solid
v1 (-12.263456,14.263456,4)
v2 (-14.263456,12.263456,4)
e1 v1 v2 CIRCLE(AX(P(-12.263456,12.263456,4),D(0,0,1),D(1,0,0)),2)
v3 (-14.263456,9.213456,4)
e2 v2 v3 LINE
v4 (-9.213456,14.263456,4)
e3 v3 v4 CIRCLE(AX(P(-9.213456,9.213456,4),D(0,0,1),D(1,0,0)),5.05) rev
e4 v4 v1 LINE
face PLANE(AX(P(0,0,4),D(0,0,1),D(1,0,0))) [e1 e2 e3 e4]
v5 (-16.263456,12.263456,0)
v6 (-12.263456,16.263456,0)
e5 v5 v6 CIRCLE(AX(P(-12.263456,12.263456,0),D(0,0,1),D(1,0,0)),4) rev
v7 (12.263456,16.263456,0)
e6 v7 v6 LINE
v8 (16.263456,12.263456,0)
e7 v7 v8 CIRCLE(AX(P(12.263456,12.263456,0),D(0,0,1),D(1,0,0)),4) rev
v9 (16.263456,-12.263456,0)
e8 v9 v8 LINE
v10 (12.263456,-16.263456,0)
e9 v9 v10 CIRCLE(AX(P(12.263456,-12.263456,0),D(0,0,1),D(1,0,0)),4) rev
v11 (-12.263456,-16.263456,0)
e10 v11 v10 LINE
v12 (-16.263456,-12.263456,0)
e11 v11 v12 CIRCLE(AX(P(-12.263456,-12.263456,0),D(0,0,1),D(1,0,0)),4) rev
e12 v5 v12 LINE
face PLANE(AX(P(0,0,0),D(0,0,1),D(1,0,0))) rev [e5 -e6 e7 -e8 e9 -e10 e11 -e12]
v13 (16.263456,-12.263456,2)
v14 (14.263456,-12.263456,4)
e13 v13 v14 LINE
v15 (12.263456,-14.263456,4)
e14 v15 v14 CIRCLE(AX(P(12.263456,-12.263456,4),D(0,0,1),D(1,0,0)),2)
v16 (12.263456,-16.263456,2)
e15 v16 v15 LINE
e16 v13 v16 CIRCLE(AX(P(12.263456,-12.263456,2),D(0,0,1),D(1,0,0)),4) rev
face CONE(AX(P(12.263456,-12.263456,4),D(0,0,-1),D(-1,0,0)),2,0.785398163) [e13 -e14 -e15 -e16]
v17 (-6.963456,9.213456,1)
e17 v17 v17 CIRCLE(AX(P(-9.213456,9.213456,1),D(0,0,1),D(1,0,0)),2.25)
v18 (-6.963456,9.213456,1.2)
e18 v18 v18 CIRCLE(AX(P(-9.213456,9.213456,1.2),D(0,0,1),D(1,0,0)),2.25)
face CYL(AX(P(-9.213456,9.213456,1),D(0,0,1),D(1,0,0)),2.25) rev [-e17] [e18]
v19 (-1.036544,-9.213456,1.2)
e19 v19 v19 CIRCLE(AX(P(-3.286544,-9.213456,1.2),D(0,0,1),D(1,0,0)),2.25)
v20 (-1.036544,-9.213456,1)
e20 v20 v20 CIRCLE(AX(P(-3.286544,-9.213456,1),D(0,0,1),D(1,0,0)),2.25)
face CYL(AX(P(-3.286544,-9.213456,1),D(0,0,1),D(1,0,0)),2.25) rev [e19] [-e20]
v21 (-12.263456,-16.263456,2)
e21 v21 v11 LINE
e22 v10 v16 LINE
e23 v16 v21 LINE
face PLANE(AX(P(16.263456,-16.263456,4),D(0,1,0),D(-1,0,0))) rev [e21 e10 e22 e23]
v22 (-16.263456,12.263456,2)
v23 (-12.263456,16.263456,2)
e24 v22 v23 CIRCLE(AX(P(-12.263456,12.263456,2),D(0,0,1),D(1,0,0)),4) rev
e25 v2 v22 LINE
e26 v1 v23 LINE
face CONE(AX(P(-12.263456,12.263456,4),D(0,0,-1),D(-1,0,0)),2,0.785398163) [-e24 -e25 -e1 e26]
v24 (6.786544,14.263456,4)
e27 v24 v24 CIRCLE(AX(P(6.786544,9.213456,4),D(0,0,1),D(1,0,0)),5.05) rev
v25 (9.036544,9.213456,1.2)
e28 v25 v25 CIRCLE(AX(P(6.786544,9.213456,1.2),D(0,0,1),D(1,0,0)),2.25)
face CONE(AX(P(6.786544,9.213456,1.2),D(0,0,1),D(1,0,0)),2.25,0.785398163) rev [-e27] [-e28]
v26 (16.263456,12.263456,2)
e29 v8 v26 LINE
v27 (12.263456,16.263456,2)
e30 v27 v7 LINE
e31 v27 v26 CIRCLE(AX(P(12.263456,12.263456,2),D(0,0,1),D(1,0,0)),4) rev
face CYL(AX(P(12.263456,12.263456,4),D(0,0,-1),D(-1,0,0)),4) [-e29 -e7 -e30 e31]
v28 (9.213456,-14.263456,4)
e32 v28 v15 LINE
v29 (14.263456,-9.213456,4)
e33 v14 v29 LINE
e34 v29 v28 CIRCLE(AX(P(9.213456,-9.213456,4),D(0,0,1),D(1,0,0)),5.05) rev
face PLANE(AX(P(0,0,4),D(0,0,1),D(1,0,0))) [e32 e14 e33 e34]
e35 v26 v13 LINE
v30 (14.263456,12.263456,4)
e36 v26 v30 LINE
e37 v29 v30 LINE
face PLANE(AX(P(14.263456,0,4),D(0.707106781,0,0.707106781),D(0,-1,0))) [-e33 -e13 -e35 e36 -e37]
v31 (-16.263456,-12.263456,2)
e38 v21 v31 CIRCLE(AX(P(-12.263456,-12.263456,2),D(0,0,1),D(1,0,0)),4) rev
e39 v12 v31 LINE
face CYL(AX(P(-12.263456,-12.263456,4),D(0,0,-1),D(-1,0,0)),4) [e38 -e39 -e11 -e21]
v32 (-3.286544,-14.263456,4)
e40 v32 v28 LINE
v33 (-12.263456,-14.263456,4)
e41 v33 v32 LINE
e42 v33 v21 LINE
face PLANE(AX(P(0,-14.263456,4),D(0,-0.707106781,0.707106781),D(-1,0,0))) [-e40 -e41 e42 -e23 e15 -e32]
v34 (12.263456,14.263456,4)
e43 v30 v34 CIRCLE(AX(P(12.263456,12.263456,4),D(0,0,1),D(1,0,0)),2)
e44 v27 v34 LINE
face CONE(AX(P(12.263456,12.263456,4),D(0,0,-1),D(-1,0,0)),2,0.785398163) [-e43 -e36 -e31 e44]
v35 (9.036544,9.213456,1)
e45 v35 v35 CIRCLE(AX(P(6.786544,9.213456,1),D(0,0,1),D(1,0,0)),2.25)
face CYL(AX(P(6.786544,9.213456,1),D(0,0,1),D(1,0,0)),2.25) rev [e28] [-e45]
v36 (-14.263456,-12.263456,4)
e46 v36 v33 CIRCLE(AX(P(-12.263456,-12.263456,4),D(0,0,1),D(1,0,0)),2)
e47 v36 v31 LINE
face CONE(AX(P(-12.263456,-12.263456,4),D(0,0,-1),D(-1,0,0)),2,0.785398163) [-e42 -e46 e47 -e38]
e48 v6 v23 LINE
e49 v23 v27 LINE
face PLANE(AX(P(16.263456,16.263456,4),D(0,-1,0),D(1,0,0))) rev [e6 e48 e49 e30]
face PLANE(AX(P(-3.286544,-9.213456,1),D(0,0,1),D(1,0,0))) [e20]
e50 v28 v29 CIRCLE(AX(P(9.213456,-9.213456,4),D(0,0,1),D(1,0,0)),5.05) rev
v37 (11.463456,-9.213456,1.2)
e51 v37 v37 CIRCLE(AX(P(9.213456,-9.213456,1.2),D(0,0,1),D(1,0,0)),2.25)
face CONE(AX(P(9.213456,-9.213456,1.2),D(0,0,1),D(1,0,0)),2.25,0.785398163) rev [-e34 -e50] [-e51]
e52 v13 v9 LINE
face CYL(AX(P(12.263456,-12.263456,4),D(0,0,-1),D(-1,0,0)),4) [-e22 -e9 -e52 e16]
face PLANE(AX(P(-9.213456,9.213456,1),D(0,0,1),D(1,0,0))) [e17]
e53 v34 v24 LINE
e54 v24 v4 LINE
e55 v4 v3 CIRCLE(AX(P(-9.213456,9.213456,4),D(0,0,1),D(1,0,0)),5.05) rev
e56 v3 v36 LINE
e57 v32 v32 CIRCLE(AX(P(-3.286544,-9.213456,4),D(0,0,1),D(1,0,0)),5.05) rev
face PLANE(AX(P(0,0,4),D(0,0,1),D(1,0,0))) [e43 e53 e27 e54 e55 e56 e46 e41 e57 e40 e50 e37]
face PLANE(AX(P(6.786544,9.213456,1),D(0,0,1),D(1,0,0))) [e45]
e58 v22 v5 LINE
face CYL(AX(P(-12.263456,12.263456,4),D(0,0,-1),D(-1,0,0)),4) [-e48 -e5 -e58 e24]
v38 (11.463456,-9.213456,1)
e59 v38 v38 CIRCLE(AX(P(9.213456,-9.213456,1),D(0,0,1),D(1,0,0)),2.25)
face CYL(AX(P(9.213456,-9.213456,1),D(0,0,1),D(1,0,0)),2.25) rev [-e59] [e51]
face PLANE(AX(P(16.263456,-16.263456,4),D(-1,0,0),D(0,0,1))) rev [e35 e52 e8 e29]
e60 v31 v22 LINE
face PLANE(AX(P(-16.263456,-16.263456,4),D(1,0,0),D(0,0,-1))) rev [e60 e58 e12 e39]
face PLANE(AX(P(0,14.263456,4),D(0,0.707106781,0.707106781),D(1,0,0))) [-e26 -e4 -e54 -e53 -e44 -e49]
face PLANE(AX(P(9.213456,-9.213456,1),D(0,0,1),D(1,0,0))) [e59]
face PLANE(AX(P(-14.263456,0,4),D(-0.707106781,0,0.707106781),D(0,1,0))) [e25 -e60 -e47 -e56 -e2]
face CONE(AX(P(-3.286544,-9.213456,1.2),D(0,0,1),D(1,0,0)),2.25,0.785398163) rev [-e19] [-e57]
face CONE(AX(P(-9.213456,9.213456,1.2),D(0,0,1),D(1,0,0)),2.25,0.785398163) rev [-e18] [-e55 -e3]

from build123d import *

# Parameters (mm, degrees)
SKETCH1_W           = 32.526911934
SKETCH1_H           = 32.526911934
BOSS_EXTRUDE1_DEPTH = 4
FILLET1_R           = 4
CHAMFER1_SIZE       = 2
SKETCH2_R           = 2.25
CUT_EXTRUDE1_DEPTH  = 3
CHAMFER2_SIZE       = 2.8


with BuildPart() as part:
    # Sketch1 → Boss-Extrude1 (new body)
    with BuildSketch(Plane.XY):
        Rectangle(SKETCH1_W, SKETCH1_H)
    extrude(amount=BOSS_EXTRUDE1_DEPTH)

    # Fillet1
    fillet1_edges = [part.edges().sort_by_distance(p)[0] for p in [
        (-16.263455967, 16.263455967, 2),
        (16.263455967, 16.263455967, 2),
        (16.263455967, -16.263455967, 2),
        (-16.263455967, -16.263455967, 2),
    ]]
    fillet(fillet1_edges, radius=FILLET1_R)

    # Chamfer1
    chamfer1_edges = [part.edges().sort_by_distance(p)[0] for p in [
        (0, -16.263455967, 4),
        (-16.263455967, 0, 4),
        (16.263455967, 0, 4),
        (0, 16.263455967, 4),
        (-15.091883092, 15.091883092, 4),
        (15.091883092, 15.091883092, 4),
        (15.091883092, -15.091883092, 4),
        (-15.091883092, -15.091883092, 4),
    ]]
    chamfer(chamfer1_edges, length=CHAMFER1_SIZE)

    # Sketch2 → Cut-Extrude1 (cut)
    with BuildSketch(Plane.XY.offset(4)):
        with Locations((-9.213455967, 9.213455967)):
            Circle(SKETCH2_R)
        with Locations((9.213455967, -9.213455967)):
            Circle(SKETCH2_R)
        with Locations((-3.286544033, -9.213455967)):
            Circle(SKETCH2_R)
        with Locations((6.786544033, 9.213455967)):
            Circle(SKETCH2_R)
    extrude(amount=-CUT_EXTRUDE1_DEPTH, mode=Mode.SUBTRACT)

    # Chamfer2
    chamfer2_edges = [part.edges().sort_by_distance(p)[0] for p in [
        (-11.463455967, 9.213455967, 4),
        (6.963455967, -9.213455967, 4),
        (-5.536544033, -9.213455967, 4),
        (4.536544033, 9.213455967, 4),
    ]]
    chamfer(chamfer2_edges, length=CHAMFER2_SIZE - 0.0001)  # a hair under: the kernel refuses the full size


solid = part.part
